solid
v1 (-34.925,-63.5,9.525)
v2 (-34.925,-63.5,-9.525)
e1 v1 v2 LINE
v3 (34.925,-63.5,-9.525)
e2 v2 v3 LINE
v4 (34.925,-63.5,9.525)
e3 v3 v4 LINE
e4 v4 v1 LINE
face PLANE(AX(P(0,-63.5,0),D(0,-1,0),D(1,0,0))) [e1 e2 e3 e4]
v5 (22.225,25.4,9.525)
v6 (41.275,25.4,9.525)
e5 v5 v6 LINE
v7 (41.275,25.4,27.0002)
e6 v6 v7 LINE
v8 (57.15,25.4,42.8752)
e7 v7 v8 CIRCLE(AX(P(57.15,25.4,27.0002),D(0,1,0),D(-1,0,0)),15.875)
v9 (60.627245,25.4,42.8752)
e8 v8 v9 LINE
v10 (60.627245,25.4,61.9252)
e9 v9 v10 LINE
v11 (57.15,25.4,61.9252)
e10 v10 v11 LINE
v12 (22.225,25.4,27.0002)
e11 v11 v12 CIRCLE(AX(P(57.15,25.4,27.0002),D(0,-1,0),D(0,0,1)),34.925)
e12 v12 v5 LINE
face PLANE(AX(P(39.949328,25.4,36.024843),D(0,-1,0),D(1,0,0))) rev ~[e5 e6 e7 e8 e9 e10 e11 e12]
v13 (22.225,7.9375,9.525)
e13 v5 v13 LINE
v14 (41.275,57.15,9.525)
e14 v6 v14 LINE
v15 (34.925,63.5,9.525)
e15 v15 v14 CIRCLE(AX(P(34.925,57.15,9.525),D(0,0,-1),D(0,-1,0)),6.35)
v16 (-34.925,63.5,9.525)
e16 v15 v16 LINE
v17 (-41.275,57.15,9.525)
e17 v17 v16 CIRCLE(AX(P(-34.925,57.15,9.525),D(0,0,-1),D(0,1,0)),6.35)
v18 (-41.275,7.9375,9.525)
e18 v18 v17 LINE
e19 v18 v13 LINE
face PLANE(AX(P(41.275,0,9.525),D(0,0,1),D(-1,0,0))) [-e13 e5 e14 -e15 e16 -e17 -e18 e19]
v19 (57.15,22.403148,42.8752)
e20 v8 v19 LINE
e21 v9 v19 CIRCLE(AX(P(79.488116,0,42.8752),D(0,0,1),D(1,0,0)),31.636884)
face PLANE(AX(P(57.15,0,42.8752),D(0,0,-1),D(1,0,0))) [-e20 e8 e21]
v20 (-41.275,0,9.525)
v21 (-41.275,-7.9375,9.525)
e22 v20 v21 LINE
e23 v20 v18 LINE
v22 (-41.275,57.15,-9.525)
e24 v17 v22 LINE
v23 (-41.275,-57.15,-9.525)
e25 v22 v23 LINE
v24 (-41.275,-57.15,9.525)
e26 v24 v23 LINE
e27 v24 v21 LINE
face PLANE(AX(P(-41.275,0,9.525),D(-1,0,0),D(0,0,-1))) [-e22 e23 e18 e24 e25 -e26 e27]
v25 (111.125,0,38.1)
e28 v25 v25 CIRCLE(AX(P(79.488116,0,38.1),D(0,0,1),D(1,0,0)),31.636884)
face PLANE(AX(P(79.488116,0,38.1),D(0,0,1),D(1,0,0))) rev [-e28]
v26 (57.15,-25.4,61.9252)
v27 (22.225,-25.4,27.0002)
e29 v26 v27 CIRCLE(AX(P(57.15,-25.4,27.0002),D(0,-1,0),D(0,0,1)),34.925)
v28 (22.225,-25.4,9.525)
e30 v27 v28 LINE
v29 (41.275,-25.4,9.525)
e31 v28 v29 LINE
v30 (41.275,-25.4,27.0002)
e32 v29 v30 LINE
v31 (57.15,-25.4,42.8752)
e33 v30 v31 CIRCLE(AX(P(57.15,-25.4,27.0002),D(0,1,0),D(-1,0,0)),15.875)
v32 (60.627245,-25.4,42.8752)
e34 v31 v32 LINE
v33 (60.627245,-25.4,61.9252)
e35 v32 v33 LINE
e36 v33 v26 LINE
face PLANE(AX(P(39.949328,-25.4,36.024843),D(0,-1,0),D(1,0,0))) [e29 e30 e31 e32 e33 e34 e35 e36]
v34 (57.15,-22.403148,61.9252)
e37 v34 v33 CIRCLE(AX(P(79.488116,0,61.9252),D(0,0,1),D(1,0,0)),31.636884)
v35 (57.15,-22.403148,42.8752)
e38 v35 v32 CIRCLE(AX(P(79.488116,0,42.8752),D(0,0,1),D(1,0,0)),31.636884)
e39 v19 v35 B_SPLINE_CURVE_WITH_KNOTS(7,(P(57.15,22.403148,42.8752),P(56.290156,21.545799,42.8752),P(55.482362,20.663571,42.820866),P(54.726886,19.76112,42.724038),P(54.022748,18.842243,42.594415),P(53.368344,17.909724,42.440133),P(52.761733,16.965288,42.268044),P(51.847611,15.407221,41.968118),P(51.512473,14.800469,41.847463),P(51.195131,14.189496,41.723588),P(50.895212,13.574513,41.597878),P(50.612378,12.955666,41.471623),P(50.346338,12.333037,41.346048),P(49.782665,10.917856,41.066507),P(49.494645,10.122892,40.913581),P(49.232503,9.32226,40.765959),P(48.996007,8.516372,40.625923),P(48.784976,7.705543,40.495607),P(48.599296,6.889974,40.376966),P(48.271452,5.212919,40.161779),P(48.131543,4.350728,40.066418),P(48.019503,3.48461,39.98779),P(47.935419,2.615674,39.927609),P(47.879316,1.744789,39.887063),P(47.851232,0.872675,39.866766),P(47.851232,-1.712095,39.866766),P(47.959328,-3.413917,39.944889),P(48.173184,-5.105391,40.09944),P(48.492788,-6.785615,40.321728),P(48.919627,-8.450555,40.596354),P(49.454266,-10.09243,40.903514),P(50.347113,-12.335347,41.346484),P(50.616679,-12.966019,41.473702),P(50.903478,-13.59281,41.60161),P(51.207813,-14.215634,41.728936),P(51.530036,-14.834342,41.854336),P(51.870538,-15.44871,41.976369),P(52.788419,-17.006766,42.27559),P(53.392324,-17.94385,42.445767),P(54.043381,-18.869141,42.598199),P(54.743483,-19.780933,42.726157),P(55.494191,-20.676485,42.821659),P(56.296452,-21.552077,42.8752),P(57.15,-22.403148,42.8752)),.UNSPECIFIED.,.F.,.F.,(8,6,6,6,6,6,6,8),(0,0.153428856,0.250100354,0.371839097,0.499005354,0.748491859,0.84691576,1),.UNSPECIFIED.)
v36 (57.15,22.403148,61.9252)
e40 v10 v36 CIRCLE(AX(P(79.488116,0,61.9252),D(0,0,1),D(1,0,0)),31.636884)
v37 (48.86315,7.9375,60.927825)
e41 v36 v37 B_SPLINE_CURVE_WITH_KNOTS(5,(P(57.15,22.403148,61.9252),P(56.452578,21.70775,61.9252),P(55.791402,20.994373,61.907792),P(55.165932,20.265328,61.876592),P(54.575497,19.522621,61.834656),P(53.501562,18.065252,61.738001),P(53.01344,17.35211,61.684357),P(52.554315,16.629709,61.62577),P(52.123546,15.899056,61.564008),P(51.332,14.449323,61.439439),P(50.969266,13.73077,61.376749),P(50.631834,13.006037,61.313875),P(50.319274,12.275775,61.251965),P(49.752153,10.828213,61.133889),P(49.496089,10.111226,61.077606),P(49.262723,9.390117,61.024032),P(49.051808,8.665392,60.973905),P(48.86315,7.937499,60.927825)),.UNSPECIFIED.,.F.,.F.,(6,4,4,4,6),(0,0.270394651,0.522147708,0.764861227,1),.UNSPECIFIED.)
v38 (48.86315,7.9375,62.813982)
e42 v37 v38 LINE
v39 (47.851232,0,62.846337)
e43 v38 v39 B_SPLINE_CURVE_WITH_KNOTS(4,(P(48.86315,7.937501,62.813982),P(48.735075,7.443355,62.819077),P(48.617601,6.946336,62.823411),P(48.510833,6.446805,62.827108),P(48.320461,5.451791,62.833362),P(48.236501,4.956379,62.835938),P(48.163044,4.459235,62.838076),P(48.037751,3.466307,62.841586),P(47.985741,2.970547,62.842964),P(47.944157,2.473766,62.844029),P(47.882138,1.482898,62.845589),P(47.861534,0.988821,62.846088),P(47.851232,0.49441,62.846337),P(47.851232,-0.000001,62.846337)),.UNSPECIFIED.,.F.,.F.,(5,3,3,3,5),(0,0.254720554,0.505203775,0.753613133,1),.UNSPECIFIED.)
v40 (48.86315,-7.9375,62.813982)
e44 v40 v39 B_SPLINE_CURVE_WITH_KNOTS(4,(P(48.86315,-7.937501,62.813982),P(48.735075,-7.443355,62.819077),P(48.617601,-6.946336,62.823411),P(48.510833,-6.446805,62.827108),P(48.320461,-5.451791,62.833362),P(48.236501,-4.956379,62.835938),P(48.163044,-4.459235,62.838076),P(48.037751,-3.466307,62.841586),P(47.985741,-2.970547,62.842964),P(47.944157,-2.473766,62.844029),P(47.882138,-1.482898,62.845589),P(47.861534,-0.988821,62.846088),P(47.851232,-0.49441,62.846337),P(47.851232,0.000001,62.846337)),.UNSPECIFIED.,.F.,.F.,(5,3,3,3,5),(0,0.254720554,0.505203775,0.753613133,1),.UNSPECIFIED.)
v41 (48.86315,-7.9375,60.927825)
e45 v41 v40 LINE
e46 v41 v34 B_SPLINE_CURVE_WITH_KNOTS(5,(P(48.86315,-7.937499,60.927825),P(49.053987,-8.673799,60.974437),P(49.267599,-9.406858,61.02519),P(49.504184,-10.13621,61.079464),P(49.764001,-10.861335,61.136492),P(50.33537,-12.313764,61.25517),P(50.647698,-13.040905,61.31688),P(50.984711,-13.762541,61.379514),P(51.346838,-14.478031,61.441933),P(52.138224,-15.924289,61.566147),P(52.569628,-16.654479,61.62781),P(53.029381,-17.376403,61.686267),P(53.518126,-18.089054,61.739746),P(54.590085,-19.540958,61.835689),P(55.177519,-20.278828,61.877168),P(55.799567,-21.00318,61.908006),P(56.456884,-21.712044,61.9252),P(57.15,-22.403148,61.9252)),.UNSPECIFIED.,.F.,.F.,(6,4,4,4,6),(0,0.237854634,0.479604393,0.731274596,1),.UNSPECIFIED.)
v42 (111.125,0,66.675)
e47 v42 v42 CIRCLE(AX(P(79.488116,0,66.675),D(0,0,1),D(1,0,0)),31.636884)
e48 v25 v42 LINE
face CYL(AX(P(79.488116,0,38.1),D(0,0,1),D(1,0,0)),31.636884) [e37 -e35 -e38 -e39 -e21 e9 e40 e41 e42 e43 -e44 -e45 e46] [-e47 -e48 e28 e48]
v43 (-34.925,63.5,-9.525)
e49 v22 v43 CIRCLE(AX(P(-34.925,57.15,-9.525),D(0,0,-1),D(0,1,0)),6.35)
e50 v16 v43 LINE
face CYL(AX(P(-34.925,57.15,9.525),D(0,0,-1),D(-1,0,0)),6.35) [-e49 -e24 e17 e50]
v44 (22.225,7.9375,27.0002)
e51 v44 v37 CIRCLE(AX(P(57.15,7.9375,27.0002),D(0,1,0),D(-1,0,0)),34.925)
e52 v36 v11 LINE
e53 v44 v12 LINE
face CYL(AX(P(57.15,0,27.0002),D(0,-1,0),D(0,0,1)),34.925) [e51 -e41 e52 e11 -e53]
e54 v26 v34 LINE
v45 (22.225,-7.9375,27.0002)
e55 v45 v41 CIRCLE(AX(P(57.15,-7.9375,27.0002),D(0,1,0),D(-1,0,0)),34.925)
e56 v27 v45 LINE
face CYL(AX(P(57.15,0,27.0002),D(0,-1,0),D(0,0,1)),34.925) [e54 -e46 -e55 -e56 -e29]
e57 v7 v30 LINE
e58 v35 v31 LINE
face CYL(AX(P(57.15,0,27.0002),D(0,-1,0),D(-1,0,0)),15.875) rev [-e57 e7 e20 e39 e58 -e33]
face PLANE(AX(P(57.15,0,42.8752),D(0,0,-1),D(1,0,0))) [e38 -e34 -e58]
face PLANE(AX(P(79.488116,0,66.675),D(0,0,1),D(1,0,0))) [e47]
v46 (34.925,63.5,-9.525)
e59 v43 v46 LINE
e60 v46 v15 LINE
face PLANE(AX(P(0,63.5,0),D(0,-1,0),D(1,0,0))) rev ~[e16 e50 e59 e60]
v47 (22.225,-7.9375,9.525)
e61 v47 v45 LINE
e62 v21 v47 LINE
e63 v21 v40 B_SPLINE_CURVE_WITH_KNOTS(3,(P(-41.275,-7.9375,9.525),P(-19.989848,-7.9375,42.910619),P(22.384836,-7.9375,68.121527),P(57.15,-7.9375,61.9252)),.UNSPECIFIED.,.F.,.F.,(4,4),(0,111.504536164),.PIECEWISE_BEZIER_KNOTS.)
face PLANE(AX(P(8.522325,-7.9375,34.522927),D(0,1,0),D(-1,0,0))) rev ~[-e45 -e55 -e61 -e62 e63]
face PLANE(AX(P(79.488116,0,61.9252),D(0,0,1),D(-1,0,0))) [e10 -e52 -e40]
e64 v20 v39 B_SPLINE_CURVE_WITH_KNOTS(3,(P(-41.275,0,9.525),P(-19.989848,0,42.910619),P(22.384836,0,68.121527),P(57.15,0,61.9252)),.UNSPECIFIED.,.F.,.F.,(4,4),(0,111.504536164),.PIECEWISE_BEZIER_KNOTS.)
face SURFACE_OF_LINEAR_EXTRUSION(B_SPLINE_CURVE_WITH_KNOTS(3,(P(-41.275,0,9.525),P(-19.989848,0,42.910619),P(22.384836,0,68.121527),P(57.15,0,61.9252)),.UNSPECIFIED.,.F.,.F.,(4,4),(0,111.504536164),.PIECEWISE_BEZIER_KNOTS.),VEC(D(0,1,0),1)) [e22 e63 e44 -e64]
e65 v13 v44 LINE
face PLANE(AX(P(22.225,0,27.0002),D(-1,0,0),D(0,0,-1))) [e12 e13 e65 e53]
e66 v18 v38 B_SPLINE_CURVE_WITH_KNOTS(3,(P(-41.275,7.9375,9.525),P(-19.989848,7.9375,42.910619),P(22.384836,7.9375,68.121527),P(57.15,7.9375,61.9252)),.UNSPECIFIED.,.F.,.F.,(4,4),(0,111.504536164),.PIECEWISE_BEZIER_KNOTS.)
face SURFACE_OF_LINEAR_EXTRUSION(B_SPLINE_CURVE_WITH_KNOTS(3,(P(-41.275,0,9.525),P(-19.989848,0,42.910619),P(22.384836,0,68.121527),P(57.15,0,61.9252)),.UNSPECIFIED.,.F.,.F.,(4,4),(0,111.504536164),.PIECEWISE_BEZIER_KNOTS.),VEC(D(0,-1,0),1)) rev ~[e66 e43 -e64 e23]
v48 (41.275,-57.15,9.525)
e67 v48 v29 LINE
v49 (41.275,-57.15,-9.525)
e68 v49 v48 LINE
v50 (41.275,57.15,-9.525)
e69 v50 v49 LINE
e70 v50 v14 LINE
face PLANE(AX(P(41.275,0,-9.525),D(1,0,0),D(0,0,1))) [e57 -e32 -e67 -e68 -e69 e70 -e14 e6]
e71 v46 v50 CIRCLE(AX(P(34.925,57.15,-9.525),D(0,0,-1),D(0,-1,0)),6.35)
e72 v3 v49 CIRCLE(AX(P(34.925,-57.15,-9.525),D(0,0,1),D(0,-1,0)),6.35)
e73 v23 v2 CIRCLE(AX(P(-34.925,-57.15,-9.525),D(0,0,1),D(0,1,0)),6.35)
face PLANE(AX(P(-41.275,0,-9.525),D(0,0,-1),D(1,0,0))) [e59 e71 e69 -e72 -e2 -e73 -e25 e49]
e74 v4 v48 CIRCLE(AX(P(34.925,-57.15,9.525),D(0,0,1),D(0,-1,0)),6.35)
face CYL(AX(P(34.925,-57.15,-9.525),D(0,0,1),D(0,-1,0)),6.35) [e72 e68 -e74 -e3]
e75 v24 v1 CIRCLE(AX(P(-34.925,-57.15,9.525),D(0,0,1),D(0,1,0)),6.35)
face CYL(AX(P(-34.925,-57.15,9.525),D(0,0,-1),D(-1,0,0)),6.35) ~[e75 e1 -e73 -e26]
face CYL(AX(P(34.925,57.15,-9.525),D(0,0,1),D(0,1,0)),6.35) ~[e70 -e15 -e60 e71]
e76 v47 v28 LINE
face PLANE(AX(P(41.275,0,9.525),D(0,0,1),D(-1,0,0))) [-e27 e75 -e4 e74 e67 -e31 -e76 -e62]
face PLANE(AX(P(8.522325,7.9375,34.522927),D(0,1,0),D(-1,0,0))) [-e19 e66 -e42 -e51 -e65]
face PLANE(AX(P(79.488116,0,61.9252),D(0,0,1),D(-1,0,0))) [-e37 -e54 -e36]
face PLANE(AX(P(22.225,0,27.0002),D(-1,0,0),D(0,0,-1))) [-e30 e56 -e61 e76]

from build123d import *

# Parameters (mm, degrees)
F1_DEPTH = 63.5
F0_W     = 19.1631158481
F0_H     = 19.05
F2_DEPTH = 25.4
F3_DEPTH = 7.9375
F4_R     = 6.35


with BuildPart() as f1:
    # F0 (on Front) → F1 (new body, symmetric)
    with BuildSketch(Plane.XZ):
        Polygon((22.225, 9.525), (-41.275, 9.525), (-41.275, -9.525), (41.275, -9.525), (41.275, 9.525), align=None)
    extrude(amount=F1_DEPTH, both=True)

    # F0 (on Front) → F2 (join, symmetric)
    with BuildSketch(Plane.XZ):
        with BuildLine():
            Line((22.225, 27.0002), (22.225, 9.525))
            Line((22.225, 9.525), (41.275, 9.525))
            Line((41.275, 9.525), (41.275, 27.0002))
            ThreePointArc((41.275, 27.0002), (45.9246798487, 38.2255201513), (57.15, 42.8752))
            Line((57.15, 42.8752), (60.325, 42.8752))
            Line((60.325, 42.8752), (60.325, 61.9252))
            Line((60.325, 61.9252), (57.15, 61.9252))
            ThreePointArc((57.15, 61.9252), (32.4542956671, 51.6959043329), (22.225, 27.0002))
        make_face()
        with Locations((69.9065579241, 52.4002)):
            Rectangle(F0_W, F0_H)
    extrude(amount=F2_DEPTH, both=True)

    # F0 (on Front) → F3 (join, symmetric)
    with BuildSketch(Plane.XZ):
        with BuildLine():
            add(Edge.make_bspline(
                [(-41.275, 9.525), (-19.9898480937, 42.9106190082), (22.3848360241, 68.1215267785), (57.15, 61.9252)],
                knots=[0, 0, 0, 0, 111.5045361635, 111.5045361635, 111.5045361635, 111.5045361635], degree=3))
            Line((-41.275, 9.525), (22.225, 9.525))
            Line((22.225, 9.525), (22.225, 27.0002))
            ThreePointArc((22.225, 27.0002), (32.4542956671, 51.6959043329), (57.15, 61.9252))
        make_face()
    extrude(amount=F3_DEPTH, both=True)

    # F4
    f4_edges = [f1.edges().sort_by_distance(p)[0] for p in [
        (-41.275, -63.5, 0),
        (41.275, -63.5, 0),
        (41.275, 63.5, 0),
        (-41.275, 63.5, 0),
    ]]
    fillet(f4_edges, radius=F4_R)

    # F0 (on Front) → F5 (revolve)
    with BuildSketch(Plane.XZ):
        Polygon((79.4881158481, 66.675), (79.4881158481, 61.9252), (79.4881158481, 42.8752), (79.4881158481, 38.1), (111.125, 38.1), (111.125, 66.675), align=None)
    revolve(axis=Axis((79.4881158481, 0, 52.3875), (0, 0, 1)))


solid = f1.part
